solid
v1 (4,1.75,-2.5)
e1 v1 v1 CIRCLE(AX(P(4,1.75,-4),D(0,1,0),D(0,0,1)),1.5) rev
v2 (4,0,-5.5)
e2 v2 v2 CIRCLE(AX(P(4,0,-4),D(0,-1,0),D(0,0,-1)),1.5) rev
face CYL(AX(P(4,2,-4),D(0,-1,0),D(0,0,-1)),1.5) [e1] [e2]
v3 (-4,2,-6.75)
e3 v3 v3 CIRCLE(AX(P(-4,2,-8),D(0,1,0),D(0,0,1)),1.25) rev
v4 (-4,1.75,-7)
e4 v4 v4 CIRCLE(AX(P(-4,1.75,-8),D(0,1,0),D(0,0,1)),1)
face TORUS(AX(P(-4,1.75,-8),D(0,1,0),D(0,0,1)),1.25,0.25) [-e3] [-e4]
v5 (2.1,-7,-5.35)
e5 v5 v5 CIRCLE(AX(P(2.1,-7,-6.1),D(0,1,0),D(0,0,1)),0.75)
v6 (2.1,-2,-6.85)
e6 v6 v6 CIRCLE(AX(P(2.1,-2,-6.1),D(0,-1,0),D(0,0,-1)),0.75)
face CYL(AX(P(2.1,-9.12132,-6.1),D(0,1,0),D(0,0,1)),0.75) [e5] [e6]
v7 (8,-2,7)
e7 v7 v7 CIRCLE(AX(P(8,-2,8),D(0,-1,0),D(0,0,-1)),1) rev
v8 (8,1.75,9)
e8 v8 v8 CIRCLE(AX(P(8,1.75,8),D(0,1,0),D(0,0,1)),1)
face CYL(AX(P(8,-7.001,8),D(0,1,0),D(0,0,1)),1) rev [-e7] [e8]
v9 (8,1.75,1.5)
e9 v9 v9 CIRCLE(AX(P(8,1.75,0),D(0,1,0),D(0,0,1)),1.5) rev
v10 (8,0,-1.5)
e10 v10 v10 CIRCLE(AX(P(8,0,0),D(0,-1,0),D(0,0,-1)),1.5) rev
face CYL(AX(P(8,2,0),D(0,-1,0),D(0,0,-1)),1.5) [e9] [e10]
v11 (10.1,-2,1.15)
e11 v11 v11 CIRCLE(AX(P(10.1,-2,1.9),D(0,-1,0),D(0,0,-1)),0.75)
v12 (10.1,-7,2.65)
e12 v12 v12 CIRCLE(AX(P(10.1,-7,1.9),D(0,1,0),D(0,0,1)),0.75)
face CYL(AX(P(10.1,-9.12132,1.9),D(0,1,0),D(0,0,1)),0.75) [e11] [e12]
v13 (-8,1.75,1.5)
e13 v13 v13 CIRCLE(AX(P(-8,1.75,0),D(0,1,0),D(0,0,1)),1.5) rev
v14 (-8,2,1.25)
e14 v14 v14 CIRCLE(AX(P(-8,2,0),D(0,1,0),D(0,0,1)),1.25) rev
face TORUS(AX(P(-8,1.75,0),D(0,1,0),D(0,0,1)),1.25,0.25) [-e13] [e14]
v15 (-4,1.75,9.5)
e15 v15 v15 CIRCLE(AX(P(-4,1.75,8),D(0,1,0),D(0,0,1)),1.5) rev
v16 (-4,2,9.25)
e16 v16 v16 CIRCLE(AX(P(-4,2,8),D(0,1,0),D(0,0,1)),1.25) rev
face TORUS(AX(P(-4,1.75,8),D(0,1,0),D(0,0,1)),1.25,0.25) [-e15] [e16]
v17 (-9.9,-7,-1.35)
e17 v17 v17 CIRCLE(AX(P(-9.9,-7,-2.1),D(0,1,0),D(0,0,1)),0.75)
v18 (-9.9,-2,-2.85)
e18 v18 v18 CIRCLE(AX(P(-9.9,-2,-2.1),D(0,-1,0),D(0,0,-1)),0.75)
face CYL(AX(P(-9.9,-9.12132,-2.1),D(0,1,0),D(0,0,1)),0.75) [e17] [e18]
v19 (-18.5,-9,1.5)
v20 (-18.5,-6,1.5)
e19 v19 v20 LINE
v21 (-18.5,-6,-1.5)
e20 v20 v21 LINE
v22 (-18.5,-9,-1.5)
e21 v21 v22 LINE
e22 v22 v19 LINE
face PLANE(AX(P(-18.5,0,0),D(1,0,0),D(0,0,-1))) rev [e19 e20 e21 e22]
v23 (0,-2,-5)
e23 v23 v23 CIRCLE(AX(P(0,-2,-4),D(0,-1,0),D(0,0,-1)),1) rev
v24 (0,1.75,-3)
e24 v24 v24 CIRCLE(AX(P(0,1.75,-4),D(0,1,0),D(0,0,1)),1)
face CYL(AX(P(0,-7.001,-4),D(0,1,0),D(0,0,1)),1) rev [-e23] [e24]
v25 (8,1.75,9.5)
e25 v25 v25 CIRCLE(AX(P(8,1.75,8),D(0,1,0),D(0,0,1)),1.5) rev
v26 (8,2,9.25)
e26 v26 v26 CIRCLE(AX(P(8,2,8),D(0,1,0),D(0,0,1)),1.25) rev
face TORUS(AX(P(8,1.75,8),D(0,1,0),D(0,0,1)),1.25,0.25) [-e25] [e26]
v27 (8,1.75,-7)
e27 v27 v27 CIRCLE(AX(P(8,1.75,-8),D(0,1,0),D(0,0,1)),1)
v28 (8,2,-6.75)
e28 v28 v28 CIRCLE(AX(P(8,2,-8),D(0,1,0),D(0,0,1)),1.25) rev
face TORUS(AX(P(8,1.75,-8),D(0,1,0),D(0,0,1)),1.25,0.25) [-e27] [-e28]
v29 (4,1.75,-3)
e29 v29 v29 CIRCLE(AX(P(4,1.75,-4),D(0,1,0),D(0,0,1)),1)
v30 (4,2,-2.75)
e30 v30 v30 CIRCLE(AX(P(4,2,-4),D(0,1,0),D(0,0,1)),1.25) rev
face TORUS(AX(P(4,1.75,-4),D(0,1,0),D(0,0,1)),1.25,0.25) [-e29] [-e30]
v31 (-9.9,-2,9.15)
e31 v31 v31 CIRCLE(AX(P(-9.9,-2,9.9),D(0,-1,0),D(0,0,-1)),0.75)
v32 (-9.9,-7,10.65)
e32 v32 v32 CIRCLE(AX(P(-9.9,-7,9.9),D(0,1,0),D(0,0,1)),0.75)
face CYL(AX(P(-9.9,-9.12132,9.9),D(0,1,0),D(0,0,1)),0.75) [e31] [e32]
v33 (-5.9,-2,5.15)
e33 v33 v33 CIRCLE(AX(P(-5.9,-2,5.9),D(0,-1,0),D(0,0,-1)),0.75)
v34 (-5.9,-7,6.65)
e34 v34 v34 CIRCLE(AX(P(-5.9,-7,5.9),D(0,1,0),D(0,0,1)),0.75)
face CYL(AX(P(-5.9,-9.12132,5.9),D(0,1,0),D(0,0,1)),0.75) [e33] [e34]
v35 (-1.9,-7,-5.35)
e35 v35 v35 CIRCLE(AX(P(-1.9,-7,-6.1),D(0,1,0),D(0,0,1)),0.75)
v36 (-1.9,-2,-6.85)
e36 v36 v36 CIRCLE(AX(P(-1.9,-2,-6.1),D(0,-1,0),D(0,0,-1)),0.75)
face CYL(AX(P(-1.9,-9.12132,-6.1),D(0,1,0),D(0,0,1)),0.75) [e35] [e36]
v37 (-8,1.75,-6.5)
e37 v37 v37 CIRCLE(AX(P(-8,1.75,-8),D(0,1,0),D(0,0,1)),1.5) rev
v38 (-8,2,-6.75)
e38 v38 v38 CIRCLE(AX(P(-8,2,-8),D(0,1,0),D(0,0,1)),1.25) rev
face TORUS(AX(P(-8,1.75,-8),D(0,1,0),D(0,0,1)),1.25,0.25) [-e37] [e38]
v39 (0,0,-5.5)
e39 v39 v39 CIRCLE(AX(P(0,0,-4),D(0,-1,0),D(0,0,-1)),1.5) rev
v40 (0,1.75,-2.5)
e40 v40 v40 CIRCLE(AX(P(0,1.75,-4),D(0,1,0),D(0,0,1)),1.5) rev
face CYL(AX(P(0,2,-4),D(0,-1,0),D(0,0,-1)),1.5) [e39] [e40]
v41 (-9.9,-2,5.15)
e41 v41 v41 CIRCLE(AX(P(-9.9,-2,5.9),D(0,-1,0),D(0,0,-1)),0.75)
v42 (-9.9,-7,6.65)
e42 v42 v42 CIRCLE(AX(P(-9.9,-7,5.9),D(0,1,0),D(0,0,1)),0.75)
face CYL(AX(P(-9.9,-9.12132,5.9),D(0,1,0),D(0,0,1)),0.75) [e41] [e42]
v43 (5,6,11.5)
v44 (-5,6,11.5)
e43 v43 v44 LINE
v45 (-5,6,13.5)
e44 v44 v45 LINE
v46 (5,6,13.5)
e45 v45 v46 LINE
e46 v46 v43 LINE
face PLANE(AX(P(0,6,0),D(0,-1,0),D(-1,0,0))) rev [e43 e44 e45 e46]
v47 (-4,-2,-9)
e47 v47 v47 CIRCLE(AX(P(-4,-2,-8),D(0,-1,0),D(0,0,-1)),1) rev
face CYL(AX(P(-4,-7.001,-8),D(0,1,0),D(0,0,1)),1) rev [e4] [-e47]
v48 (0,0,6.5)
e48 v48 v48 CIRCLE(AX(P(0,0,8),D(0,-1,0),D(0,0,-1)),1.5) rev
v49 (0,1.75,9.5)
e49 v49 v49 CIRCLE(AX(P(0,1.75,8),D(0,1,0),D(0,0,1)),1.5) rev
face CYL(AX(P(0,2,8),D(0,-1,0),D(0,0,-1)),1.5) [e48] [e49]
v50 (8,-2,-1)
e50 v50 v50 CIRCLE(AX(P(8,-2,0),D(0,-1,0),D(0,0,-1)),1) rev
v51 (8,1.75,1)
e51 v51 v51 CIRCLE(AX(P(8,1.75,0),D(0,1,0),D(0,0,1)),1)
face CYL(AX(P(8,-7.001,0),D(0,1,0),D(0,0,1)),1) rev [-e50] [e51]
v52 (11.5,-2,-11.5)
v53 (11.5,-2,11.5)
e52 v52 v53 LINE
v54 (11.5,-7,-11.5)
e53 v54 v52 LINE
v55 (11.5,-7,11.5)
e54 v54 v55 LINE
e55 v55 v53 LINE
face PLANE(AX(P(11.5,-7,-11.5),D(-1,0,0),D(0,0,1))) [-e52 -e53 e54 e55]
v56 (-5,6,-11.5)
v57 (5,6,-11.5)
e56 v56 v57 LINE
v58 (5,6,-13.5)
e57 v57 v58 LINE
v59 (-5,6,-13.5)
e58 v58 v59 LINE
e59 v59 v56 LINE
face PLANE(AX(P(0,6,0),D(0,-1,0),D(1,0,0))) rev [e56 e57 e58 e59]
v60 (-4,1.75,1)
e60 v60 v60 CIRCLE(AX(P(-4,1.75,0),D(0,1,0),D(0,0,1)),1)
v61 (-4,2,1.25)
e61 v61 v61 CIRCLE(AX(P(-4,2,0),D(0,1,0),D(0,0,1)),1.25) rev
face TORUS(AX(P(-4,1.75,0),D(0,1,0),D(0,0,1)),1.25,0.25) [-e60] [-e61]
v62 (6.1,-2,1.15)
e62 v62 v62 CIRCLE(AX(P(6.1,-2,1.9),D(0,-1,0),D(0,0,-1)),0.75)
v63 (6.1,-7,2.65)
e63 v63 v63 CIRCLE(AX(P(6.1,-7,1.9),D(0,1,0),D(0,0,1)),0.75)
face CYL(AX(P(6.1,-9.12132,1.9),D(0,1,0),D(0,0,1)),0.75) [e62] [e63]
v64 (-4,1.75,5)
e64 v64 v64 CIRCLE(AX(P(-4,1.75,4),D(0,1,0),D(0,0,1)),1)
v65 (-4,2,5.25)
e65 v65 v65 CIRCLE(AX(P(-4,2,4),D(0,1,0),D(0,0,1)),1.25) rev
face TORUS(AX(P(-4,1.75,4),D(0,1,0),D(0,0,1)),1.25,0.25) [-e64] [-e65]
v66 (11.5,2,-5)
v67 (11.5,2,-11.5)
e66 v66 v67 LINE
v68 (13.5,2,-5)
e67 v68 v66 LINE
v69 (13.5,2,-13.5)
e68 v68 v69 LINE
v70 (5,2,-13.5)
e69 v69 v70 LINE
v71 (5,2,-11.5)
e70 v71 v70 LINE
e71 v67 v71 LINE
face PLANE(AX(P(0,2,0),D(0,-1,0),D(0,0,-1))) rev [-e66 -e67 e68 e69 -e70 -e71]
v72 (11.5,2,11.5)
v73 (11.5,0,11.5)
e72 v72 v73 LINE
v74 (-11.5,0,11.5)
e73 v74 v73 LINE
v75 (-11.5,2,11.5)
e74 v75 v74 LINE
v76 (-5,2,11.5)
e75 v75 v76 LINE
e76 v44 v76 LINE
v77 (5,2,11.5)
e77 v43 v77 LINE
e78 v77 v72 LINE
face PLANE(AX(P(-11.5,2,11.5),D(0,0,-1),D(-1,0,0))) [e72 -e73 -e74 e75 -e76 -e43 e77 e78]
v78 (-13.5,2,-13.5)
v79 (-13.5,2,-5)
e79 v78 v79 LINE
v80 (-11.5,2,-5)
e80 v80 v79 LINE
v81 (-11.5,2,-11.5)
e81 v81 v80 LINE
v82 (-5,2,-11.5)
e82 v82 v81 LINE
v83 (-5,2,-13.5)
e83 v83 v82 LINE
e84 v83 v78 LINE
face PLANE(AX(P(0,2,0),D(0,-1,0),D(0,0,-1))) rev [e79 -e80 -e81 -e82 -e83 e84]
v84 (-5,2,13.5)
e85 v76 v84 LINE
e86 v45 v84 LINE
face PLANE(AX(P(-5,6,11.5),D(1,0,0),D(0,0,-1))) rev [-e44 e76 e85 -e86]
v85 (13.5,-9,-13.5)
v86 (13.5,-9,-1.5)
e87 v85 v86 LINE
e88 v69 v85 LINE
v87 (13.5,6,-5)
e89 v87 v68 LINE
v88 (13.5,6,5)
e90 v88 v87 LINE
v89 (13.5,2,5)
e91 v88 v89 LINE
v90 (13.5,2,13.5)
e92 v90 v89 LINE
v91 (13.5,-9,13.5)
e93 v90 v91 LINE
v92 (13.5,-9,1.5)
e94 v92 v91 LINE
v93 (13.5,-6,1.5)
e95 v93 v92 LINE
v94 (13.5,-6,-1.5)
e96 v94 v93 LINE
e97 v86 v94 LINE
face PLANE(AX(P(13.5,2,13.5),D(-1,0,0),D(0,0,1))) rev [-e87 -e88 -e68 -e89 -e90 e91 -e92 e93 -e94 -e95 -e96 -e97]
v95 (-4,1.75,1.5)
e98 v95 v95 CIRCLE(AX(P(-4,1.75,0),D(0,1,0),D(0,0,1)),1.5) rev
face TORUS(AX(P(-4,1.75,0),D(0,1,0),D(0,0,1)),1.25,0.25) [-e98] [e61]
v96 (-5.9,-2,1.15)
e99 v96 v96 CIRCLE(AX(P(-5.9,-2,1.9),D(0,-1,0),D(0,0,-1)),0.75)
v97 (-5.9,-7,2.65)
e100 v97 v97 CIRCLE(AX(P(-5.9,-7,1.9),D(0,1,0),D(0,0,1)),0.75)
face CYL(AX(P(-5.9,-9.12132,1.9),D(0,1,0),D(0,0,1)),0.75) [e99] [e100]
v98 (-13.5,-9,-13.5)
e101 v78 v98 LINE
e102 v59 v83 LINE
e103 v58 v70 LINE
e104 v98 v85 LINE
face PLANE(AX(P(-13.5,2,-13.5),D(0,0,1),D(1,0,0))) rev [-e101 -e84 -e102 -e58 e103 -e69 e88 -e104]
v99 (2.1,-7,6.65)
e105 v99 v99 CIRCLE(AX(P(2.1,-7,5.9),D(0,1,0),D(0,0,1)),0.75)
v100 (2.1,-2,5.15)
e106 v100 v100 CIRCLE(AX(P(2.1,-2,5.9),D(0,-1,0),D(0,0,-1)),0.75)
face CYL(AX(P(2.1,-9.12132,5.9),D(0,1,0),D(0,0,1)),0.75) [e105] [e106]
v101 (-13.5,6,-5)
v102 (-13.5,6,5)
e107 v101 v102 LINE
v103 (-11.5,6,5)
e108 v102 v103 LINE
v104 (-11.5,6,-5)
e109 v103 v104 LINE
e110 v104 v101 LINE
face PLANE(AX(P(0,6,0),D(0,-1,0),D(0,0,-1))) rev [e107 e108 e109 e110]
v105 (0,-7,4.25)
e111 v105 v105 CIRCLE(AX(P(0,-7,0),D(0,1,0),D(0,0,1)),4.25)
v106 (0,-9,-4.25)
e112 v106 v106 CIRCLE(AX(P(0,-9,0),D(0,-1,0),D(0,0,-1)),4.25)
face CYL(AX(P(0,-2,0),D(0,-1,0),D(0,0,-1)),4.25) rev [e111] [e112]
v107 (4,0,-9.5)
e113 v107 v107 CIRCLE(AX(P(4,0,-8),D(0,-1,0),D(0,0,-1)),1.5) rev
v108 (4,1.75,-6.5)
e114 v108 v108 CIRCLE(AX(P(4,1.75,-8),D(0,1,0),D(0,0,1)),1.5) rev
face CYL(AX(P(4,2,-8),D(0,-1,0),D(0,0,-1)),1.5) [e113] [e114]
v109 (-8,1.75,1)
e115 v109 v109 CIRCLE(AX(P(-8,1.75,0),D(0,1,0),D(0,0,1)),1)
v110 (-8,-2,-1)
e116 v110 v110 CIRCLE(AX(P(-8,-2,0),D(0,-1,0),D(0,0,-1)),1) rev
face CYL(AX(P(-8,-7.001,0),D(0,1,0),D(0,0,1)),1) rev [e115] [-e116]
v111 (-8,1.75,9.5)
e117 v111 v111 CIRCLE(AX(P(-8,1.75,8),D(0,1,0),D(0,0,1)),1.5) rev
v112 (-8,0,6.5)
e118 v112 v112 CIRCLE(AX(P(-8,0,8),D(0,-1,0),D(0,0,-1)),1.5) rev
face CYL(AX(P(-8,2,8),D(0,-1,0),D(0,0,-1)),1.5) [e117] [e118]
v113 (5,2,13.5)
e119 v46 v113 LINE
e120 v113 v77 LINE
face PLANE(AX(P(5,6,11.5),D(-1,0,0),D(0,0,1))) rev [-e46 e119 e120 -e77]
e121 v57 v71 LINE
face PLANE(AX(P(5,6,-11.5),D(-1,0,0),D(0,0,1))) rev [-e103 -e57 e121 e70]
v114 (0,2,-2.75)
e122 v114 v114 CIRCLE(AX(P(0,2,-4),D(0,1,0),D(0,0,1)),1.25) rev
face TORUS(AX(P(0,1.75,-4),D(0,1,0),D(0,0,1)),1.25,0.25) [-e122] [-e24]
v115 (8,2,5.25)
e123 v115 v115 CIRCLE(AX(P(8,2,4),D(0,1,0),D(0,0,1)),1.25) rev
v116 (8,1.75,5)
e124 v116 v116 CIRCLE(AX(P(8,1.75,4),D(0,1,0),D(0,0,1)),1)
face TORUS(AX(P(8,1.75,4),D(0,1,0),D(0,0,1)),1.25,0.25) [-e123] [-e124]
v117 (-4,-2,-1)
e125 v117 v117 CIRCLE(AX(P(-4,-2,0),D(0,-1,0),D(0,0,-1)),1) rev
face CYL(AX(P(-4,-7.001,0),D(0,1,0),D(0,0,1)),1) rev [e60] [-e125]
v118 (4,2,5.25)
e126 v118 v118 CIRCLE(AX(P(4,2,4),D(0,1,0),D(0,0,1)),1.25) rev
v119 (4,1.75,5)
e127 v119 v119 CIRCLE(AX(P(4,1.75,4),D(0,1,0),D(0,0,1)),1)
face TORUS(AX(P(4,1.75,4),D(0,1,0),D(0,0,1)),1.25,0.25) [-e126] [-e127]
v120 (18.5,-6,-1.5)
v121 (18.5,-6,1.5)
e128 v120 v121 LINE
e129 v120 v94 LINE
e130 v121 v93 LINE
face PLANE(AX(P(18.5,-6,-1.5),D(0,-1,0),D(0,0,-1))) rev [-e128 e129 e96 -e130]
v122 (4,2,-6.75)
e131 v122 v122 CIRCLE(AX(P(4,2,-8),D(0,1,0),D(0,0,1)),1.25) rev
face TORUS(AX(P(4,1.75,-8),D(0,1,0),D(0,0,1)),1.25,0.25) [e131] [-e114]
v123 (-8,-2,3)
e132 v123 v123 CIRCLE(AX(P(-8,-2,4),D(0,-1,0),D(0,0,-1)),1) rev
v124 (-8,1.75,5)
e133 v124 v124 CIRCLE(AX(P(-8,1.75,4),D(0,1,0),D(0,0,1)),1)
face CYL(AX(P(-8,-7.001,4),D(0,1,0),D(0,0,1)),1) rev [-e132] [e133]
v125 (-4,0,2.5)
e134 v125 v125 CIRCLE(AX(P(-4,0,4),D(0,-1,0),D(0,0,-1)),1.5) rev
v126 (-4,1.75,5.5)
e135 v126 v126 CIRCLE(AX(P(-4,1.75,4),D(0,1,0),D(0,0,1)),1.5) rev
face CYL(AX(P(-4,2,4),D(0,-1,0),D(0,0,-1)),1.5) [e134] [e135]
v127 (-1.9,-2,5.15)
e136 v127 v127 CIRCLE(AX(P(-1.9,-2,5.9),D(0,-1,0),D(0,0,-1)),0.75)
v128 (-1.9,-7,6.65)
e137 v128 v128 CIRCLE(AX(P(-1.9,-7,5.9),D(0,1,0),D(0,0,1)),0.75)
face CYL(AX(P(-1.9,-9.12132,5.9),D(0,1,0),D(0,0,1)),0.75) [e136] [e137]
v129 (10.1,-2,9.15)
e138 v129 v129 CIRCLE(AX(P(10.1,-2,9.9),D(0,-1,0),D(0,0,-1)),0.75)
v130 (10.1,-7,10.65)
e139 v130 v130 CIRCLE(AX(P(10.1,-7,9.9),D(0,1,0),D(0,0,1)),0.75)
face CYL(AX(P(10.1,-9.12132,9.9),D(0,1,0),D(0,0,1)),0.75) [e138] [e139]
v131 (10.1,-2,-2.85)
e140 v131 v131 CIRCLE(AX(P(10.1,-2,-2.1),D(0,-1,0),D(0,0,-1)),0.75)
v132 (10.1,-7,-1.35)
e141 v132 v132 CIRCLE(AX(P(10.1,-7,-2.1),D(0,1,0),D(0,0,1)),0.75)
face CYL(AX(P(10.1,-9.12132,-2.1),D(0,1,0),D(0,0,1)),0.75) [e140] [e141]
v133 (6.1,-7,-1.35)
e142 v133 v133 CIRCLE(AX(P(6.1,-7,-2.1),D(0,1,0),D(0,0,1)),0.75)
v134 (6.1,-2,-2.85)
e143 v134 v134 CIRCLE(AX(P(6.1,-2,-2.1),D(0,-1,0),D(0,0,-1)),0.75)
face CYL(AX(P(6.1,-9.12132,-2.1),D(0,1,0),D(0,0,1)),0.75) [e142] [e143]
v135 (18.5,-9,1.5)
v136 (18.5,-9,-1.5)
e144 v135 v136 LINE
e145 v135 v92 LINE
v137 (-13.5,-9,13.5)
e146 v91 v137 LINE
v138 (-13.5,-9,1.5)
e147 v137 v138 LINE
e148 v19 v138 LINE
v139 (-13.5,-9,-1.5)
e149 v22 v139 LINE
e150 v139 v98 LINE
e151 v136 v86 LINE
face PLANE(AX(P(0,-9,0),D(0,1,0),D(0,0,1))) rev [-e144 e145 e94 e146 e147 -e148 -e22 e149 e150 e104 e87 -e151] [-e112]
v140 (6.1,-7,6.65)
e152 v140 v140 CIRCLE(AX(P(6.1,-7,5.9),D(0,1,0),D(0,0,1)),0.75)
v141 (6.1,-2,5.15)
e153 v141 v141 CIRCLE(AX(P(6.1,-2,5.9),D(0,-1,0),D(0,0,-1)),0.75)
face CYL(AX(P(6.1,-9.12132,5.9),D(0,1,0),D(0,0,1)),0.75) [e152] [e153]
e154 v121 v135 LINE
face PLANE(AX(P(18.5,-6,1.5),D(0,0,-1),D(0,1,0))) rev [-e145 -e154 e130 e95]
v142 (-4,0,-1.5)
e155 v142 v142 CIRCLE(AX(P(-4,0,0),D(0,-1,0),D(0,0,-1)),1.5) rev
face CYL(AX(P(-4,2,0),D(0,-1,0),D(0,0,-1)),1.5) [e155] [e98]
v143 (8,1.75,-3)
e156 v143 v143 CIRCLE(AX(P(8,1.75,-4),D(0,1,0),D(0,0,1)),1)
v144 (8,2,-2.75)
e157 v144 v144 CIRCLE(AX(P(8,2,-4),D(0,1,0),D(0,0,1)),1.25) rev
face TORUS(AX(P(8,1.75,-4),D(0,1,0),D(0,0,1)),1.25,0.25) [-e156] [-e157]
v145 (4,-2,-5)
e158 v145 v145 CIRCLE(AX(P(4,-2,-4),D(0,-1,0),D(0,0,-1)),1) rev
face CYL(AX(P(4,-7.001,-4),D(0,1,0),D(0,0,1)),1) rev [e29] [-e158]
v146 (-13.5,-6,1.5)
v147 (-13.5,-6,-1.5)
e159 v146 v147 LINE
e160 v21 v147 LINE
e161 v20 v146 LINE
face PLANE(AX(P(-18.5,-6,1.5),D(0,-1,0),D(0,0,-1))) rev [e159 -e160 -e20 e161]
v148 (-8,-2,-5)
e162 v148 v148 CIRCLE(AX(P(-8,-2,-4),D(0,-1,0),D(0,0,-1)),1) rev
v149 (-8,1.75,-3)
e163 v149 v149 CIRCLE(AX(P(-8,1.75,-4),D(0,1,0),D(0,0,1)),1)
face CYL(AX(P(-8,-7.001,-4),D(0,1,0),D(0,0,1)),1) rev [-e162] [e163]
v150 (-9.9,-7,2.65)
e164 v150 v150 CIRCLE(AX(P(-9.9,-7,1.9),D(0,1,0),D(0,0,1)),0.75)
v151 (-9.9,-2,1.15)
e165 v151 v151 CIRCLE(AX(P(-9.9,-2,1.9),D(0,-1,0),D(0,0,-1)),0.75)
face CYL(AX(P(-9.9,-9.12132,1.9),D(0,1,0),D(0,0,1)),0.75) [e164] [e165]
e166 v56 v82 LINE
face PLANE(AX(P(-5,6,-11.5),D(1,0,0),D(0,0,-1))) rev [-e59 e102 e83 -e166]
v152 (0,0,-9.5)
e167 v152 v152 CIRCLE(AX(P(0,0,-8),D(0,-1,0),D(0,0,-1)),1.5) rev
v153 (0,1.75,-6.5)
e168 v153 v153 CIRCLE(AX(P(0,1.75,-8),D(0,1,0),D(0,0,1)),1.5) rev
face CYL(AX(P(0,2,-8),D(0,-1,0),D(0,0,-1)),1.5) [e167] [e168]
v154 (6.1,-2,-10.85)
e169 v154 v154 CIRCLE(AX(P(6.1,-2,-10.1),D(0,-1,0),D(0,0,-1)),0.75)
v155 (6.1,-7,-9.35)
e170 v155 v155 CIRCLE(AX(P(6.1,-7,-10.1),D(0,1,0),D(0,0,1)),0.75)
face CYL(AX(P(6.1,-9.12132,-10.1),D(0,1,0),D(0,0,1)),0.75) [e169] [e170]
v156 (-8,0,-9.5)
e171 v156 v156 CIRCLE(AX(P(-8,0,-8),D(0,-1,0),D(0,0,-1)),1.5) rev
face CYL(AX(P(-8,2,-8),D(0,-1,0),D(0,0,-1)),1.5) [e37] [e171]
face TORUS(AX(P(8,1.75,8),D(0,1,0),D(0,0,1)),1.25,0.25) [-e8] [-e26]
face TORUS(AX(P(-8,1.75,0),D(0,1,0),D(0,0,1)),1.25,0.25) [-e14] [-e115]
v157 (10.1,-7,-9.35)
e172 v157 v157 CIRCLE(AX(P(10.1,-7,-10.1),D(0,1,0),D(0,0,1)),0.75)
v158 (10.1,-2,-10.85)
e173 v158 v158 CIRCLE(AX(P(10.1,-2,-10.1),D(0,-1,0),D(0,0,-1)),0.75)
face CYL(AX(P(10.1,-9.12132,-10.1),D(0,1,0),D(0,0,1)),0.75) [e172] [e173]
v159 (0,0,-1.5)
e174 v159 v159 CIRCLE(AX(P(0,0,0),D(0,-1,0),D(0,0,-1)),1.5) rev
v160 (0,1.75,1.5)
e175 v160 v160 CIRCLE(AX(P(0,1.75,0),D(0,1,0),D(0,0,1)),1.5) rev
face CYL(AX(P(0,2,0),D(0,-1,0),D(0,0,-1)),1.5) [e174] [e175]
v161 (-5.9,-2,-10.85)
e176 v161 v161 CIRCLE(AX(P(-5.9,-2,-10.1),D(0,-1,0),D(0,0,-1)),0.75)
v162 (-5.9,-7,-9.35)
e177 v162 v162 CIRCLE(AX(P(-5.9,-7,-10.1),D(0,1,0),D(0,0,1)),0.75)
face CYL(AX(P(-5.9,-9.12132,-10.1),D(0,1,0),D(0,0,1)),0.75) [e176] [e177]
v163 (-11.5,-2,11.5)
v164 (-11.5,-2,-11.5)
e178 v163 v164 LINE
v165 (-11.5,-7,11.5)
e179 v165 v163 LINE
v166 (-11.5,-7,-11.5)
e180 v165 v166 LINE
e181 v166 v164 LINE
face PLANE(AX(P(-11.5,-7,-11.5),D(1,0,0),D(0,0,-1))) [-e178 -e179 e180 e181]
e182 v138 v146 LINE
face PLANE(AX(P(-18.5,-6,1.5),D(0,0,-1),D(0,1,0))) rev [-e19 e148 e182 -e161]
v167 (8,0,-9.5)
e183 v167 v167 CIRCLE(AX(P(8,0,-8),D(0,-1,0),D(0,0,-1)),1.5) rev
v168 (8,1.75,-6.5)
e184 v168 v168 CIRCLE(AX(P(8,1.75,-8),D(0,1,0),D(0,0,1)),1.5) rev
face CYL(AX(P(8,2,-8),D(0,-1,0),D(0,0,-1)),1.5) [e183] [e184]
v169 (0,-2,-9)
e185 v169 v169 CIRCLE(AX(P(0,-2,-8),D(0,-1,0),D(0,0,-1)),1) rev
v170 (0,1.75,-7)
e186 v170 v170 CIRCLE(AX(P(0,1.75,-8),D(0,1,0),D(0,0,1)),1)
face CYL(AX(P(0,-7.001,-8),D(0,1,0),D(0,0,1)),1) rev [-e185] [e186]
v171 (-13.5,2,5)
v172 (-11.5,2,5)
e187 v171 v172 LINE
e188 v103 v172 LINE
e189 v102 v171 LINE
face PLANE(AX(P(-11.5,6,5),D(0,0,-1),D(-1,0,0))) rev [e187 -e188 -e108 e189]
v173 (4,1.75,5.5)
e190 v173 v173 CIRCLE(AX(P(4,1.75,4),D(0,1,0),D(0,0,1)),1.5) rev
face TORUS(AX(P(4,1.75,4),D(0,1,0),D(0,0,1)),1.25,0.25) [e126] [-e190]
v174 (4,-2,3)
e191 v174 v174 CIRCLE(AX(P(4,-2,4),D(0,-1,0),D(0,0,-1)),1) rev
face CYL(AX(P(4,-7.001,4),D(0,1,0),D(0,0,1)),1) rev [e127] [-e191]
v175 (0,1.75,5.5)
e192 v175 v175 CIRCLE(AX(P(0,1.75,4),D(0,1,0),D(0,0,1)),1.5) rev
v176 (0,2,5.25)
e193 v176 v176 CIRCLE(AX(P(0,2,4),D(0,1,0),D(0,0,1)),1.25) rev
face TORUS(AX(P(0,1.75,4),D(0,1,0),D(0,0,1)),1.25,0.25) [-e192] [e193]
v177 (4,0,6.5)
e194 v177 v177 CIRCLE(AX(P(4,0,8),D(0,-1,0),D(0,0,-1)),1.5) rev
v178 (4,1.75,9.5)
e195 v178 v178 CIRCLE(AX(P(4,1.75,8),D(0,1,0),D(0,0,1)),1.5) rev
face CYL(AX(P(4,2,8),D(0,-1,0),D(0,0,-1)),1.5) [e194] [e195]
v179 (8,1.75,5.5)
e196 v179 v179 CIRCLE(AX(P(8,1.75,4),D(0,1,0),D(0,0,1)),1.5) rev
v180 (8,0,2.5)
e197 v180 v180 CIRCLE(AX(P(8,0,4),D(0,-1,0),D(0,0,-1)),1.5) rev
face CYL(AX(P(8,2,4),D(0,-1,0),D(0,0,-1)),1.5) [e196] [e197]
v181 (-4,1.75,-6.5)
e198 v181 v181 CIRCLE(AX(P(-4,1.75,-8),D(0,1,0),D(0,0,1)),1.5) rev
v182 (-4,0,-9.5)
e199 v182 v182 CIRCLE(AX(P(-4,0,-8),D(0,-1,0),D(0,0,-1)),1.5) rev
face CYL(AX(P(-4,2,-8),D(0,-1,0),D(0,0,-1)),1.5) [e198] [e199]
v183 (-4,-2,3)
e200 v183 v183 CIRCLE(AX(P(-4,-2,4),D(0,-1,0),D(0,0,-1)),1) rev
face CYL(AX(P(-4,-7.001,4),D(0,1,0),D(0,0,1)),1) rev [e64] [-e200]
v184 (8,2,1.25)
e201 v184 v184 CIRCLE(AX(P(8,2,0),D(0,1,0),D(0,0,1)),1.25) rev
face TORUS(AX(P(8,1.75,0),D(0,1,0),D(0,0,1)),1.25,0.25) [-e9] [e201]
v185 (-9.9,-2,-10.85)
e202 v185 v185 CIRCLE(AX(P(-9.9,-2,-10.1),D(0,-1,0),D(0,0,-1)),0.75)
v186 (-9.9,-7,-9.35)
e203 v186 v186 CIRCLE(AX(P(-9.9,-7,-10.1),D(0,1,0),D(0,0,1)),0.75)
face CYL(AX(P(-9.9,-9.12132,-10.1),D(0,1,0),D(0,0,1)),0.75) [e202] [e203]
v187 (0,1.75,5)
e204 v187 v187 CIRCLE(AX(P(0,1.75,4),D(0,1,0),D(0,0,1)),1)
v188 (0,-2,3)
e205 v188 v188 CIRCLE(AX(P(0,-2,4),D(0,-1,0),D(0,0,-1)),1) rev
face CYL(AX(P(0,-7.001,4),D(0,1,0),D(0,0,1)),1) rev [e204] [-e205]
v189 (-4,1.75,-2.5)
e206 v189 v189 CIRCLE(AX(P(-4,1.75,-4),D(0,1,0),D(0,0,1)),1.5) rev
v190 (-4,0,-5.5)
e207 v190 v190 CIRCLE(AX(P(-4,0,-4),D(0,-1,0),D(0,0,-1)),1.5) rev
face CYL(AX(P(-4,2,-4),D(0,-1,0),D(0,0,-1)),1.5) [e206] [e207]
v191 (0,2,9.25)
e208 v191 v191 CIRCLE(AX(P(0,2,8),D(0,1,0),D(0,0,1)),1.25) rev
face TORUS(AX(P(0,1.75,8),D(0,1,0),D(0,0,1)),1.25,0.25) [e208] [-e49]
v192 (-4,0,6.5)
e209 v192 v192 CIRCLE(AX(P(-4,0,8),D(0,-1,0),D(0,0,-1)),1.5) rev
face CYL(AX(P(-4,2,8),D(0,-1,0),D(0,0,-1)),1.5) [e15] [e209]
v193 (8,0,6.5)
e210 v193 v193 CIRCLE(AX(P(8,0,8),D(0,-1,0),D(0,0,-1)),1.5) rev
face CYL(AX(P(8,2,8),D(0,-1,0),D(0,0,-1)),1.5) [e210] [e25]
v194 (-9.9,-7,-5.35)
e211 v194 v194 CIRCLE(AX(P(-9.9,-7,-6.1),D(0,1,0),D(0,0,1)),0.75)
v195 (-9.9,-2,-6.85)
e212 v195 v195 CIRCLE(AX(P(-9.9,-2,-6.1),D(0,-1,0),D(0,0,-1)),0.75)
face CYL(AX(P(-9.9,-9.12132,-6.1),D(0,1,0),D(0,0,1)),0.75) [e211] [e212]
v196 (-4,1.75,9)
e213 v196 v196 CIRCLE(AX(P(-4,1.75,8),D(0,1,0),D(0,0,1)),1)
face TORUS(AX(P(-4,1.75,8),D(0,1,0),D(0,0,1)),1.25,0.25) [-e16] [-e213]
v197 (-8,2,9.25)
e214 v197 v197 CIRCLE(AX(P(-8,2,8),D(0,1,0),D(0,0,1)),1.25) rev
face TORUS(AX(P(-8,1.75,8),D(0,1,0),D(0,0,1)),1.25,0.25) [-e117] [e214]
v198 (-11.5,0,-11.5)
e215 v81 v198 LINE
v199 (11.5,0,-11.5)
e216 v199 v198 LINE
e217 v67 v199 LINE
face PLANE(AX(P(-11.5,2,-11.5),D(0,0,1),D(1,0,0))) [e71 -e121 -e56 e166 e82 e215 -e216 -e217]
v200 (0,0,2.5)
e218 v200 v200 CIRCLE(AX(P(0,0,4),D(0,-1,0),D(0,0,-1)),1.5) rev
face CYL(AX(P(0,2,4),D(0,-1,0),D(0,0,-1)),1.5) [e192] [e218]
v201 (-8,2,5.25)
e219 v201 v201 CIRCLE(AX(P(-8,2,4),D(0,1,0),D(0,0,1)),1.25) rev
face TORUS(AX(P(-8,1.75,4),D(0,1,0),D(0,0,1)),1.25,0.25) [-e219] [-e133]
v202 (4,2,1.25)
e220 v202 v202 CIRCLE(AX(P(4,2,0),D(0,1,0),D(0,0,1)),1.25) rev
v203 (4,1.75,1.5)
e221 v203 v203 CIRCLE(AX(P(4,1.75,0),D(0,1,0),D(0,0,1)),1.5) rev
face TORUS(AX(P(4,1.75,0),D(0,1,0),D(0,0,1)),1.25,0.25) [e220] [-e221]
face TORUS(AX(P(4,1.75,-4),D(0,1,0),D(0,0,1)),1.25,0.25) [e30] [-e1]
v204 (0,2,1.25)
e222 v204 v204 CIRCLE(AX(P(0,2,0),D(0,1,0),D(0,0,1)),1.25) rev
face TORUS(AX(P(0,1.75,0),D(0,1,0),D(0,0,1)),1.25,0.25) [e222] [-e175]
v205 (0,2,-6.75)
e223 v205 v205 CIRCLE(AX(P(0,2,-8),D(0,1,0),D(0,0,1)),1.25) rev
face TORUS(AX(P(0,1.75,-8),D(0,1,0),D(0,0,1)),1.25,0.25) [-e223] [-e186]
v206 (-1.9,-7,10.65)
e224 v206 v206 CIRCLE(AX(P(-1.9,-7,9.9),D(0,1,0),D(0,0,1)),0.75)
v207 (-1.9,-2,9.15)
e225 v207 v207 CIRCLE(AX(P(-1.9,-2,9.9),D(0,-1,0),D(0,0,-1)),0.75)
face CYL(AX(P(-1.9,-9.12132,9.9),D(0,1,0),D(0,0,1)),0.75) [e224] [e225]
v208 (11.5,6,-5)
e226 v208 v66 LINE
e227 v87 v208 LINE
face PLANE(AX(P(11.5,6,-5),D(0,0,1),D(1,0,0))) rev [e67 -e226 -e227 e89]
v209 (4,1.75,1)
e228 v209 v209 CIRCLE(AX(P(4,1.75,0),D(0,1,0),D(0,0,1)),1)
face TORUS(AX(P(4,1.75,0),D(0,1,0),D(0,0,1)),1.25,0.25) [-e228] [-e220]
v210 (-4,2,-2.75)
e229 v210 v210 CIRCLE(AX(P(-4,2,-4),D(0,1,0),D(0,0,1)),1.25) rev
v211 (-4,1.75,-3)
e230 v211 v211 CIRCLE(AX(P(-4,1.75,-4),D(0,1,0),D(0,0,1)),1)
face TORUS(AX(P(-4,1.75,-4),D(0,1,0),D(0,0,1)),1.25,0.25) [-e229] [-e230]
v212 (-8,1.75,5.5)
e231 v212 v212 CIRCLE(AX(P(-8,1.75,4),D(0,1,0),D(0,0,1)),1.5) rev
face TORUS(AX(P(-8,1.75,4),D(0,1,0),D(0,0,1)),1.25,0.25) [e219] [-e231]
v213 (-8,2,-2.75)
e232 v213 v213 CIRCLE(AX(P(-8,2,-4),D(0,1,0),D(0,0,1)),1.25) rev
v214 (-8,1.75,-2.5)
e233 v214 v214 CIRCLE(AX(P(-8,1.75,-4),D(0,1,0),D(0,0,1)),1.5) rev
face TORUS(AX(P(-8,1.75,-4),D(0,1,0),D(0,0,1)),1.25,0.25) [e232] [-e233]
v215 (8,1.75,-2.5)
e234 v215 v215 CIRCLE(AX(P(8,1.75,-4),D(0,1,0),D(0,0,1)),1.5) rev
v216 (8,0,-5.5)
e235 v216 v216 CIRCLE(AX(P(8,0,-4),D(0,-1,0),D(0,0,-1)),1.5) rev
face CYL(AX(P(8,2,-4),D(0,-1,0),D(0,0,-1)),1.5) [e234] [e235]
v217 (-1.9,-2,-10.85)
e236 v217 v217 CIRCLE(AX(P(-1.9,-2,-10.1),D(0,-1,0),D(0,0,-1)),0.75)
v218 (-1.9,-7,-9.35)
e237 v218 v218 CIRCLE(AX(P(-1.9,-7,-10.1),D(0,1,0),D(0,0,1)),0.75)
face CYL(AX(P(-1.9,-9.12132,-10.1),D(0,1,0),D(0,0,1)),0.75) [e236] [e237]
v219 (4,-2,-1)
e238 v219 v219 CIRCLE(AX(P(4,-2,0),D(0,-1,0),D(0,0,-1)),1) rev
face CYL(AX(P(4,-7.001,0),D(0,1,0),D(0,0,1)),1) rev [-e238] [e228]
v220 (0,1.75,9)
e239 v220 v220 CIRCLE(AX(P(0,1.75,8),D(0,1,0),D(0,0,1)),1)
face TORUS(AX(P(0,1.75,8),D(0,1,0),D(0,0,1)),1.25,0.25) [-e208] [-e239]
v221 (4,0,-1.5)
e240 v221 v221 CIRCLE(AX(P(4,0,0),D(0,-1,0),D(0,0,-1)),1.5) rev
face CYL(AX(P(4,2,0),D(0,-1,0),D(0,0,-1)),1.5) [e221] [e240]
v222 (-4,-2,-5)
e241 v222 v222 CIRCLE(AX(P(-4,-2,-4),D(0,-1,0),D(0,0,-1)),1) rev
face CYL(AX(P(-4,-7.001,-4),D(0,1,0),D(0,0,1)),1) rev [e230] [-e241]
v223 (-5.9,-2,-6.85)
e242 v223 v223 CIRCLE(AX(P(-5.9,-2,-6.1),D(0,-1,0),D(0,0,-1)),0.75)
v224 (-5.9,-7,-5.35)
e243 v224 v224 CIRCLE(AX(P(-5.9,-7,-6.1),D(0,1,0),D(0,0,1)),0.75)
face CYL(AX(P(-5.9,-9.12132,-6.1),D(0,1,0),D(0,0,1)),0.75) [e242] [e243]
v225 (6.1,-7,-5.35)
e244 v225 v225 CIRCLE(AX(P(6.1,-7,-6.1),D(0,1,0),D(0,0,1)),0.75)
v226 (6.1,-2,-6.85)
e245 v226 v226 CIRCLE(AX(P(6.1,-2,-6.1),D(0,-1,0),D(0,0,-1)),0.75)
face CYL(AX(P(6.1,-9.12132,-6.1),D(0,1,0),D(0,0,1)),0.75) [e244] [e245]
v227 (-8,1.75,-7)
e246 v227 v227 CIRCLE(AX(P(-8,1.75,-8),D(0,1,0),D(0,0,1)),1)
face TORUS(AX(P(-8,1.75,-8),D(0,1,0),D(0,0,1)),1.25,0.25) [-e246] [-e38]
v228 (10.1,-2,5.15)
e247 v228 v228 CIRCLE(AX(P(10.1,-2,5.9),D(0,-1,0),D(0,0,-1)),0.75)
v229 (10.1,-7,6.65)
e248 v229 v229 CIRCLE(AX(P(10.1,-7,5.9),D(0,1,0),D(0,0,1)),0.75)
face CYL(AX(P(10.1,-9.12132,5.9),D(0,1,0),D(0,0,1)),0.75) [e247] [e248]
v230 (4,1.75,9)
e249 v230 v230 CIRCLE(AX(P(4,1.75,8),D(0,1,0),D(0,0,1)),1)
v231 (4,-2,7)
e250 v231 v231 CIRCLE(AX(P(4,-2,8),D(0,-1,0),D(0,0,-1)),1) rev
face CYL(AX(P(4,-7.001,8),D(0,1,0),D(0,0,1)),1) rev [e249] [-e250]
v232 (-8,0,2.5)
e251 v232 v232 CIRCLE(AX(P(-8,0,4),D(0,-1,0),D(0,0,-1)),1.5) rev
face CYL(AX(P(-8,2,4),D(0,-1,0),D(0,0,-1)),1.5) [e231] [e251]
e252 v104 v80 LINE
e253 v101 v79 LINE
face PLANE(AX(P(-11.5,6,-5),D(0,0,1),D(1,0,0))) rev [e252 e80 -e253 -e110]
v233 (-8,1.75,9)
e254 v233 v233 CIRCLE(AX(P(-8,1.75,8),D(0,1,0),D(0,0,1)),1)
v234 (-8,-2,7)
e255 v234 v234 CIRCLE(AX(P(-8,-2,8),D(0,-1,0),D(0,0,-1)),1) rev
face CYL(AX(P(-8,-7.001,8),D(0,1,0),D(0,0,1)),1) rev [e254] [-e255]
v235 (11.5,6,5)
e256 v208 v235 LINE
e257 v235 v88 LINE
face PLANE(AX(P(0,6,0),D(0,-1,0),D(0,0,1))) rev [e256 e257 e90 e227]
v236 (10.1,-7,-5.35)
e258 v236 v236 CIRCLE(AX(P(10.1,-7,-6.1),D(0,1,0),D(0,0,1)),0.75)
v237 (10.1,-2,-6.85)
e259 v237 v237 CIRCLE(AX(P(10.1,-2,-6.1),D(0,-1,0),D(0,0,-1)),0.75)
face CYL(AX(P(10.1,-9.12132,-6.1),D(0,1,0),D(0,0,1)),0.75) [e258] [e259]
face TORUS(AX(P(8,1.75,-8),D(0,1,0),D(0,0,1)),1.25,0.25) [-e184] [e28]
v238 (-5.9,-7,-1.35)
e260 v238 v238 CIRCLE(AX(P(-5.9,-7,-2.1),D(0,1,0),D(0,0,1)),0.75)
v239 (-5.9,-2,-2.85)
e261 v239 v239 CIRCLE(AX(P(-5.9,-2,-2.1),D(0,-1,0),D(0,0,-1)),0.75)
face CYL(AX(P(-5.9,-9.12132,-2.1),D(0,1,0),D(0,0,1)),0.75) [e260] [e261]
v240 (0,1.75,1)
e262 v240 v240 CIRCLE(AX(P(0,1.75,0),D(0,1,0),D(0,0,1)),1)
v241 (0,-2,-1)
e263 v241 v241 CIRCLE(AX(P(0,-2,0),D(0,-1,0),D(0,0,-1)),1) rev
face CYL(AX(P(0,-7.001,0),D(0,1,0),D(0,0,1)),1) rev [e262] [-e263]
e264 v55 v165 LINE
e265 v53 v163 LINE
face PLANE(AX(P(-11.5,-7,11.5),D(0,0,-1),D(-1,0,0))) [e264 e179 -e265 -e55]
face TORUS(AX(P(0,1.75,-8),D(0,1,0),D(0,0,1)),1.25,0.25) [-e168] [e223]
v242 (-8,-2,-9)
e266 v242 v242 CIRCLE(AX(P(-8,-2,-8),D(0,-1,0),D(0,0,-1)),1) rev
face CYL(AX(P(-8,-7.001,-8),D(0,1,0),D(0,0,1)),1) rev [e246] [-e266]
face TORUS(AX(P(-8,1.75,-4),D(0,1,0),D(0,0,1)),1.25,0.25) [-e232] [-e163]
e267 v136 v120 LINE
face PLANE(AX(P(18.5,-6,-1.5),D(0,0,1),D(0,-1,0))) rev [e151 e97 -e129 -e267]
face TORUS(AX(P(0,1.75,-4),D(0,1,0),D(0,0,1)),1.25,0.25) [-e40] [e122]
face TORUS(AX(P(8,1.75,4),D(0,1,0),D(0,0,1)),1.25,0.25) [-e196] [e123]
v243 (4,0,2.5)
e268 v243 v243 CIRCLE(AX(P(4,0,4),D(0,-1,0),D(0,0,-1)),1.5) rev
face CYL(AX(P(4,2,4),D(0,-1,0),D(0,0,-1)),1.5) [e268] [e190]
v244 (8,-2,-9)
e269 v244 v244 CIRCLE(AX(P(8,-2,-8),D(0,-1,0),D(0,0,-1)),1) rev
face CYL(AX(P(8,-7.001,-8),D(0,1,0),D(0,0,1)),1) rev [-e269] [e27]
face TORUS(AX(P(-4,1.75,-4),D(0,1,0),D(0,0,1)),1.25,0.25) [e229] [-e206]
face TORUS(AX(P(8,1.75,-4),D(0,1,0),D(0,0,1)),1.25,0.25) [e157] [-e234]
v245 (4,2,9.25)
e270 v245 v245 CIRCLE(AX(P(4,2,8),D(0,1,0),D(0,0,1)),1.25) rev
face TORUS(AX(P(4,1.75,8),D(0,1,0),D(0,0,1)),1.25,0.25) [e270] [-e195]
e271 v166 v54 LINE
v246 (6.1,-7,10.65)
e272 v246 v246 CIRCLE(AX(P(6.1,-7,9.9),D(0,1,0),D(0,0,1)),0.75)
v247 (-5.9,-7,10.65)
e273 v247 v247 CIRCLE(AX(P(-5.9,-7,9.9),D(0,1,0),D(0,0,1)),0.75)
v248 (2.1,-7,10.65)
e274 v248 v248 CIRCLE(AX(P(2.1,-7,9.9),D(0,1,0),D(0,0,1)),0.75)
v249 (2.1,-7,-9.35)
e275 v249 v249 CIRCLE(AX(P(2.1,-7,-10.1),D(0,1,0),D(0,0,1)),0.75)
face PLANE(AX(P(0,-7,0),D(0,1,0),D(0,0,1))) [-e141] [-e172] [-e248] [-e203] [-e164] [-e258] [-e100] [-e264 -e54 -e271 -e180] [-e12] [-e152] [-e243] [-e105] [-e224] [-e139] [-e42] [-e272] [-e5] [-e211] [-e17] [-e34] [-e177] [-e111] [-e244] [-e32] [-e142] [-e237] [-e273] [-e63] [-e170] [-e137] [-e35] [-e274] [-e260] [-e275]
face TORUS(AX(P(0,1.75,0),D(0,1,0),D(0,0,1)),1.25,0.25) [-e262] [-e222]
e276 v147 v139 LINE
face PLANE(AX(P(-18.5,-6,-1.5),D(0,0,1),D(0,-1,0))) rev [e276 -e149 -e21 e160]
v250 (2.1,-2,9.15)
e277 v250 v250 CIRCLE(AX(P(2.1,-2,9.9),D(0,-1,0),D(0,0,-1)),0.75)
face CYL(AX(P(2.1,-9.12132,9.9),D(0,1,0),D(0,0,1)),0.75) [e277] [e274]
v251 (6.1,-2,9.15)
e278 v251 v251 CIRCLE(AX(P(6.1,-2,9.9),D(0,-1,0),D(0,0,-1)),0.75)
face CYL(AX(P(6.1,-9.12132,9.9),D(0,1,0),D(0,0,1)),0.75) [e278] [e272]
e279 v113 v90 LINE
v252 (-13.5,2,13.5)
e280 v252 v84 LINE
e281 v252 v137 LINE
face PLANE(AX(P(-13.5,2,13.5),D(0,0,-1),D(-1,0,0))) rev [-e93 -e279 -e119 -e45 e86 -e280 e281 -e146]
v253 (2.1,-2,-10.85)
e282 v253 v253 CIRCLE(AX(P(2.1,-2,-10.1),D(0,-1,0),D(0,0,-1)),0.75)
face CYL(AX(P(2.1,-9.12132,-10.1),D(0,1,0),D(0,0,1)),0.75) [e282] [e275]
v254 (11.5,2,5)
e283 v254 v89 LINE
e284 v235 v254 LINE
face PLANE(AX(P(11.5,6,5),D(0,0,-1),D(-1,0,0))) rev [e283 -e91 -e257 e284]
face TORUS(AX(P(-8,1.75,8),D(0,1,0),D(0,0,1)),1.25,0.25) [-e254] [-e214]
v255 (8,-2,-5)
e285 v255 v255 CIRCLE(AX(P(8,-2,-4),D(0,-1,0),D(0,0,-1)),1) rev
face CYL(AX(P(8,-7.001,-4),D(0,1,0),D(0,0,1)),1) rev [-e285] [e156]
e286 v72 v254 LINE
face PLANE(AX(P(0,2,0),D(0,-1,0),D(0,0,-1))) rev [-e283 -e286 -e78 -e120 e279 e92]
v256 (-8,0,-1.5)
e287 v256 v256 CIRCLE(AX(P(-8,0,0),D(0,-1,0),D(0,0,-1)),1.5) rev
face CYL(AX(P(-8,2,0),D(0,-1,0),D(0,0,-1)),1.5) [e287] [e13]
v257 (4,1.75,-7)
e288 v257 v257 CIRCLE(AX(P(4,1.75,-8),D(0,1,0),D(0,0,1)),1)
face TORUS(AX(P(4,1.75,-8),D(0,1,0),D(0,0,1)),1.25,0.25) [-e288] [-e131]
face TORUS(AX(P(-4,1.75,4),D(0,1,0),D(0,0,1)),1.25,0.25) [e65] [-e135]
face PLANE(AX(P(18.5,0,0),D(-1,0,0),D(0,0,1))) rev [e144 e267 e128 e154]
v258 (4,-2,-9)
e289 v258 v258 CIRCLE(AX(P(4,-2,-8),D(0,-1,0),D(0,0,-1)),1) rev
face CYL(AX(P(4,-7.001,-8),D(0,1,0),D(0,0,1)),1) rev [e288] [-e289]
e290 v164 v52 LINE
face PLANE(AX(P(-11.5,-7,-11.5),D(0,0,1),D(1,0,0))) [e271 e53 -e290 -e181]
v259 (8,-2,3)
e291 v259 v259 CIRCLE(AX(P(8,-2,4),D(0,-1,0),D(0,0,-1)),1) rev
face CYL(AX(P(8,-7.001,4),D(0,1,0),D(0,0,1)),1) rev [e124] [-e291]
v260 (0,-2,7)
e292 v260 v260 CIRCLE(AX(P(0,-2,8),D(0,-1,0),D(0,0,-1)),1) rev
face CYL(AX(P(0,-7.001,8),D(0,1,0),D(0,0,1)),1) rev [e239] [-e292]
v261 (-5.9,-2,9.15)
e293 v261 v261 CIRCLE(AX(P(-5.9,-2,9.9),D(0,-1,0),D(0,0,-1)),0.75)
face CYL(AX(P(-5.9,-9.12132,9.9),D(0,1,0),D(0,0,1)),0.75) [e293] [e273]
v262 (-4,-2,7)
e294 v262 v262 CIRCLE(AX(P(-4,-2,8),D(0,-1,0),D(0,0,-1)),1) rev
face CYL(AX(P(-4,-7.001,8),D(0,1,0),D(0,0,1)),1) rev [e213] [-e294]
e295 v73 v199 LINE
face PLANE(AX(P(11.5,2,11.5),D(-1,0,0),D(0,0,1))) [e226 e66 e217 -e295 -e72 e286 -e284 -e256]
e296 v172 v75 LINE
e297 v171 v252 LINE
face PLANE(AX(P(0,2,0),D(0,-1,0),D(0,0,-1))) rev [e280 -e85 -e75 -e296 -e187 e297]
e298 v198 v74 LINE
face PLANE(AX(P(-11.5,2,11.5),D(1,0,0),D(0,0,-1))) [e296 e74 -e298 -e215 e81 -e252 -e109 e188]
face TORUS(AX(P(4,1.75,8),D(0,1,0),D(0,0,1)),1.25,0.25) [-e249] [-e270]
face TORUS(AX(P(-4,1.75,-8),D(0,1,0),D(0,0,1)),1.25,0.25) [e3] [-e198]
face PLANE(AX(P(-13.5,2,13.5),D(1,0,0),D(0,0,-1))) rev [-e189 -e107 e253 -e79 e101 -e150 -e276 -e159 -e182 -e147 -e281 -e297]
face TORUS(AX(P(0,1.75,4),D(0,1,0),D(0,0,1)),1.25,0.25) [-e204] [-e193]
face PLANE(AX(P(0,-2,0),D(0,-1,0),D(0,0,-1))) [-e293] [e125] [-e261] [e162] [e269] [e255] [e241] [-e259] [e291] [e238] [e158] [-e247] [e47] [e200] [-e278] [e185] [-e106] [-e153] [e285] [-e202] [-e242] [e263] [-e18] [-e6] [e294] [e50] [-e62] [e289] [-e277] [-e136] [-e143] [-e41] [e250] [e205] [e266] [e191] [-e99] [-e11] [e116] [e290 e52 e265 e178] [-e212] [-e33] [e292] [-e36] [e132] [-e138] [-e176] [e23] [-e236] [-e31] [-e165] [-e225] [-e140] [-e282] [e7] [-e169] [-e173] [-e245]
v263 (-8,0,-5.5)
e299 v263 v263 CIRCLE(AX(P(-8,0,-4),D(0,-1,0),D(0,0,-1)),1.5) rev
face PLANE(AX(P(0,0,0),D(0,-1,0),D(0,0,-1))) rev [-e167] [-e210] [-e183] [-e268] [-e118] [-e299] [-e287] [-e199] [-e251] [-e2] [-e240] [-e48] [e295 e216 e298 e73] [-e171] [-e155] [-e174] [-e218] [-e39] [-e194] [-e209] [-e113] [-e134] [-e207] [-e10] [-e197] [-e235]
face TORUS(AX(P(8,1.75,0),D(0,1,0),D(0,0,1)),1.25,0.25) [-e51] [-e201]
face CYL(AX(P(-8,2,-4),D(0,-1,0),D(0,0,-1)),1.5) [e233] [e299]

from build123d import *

# Parameters (mm, degrees)
SKETCH1_W              = 27
SKETCH1_H              = 27
SKETCH1_W_2            = 23
SKETCH1_H_2            = 23
BOSS_EXTRUDE1_DEPTH    = 2
SKETCH2_W              = 27
SKETCH2_H              = 27
BOSS_EXTRUDE2_DEPTH    = 2
SKETCH3_W              = 27
SKETCH3_H              = 27
SKETCH3_W_2            = 23
SKETCH3_H_2            = 23
BOSS_EXTRUDE3_DEPTH    = 5
SKETCH6_R              = 1.5
BOSS_EXTRUDE5_DEPTH    = 2
CUT_EXTRUDE2_REACH     = 23.107
SKETCH7_R              = 1
FILLET1_R              = 0.25
LPATTERN3_COUNT        = 5
LPATTERN3_PITCH        = 4
LPATTERN3_COUNT_DIR2   = 5
LPATTERN3_PITCH_DIR2   = 4
FILLET1_OF_LPATTERN3_R = 0.25
SKETCH11_R             = 0.75
BOSS_EXTRUDE8_DEPTH    = 5
LPATTERN2_COUNT        = 6
LPATTERN2_PITCH        = 4
LPATTERN2_COUNT_DIR2   = 6
LPATTERN2_PITCH_DIR2   = 4
SKETCH8_W              = 27
SKETCH8_H              = 27
BOSS_EXTRUDE6_DEPTH    = 2
SKETCH9_R              = 4.25
CUT_EXTRUDE3_DEPTH     = 7
SKETCH10_W             = 2
SKETCH10_H             = 10
BOSS_EXTRUDE7_DEPTH    = 4
CIRPATTERN2_COUNT      = 4
SKETCH12_W             = 3
SKETCH12_H             = 3
BOSS_EXTRUDE9_DEPTH    = 5
CIRPATTERN1_COUNT      = 2


with BuildPart() as part:
    # Sketch1 → Boss-Extrude1 (new body)
    with BuildSketch(Plane(origin=(0, 0, 0), x_dir=(1, 0, 0), z_dir=(0, 1, 0))):
        Rectangle(SKETCH1_W, SKETCH1_H)
        Rectangle(SKETCH1_W_2, SKETCH1_H_2, mode=Mode.SUBTRACT)
    extrude(amount=BOSS_EXTRUDE1_DEPTH)

    # Sketch2 → Boss-Extrude2 (add)
    with BuildSketch(Plane.XZ):
        Rectangle(SKETCH2_W, SKETCH2_H)
    extrude(amount=BOSS_EXTRUDE2_DEPTH)

    # Sketch3 → Boss-Extrude3 (add)
    with BuildSketch(Plane.XZ.offset(2)):
        Rectangle(SKETCH3_W, SKETCH3_H)
        Rectangle(SKETCH3_W_2, SKETCH3_H_2, mode=Mode.SUBTRACT)
    extrude(amount=BOSS_EXTRUDE3_DEPTH)

    # Sketch6 → Boss-Extrude5 (add)
    with BuildSketch(Plane(origin=(0, 0, 0), x_dir=(1, 0, 0), z_dir=(0, 1, 0))):
        with Locations(Location((8, 8, 0), (0, 0, 90))):
            Circle(SKETCH6_R)
    boss_extrude5 = extrude(amount=BOSS_EXTRUDE5_DEPTH)

    # Sketch7 → Cut-Extrude2 (cut, up to next)
    with BuildSketch(Plane(origin=(0, 2, 0), x_dir=(1, 0, 0), z_dir=(0, 1, 0)), mode=Mode.PRIVATE) as cut_extrude2_sk1:
        with Locations(Location((8, 8, 0), (0, 0, 270))):
            Circle(SKETCH7_R)
    cut_extrude2_tool1 = extrude(cut_extrude2_sk1.sketch, amount=-CUT_EXTRUDE2_REACH, mode=Mode.PRIVATE) & part.part
    cut_extrude2 = cut_extrude2_tool1.solids().sort_by_distance((8, 2, -8))[0]
    add(cut_extrude2, mode=Mode.SUBTRACT)

    # Fillet1
    fillet1_edges = [part.edges().sort_by_distance(p)[0] for p in [
        (8, 2, -6.5),
        (8, 2, -9),
    ]]
    fillet(fillet1_edges, radius=FILLET1_R - 0.0001)  # a hair under: the kernel refuses the full size

    # LPattern3: Boss-Extrude5, Cut-Extrude2 5 × 5
    with Locations(*[(-j * LPATTERN3_PITCH_DIR2, 0, i * LPATTERN3_PITCH) for i in range(LPATTERN3_COUNT) for j in range(LPATTERN3_COUNT_DIR2) if (i, j) != (0, 0)]):
        add(boss_extrude5)
        add(cut_extrude2, mode=Mode.SUBTRACT)

    # Fillet1 of LPattern3
    fillet1_of_lpattern3_edges = [part.edges().sort_by_distance(p)[0] for p in [
        (4, 2, -6.5),
        (4, 2, -9),
        (0, 2, -6.5),
        (0, 2, -9),
        (-4, 2, -6.5),
        (-4, 2, -9),
        (-8, 2, -6.5),
        (-8, 2, -9),
        (8, 2, -2.5),
        (8, 2, -5),
        (4, 2, -2.5),
        (4, 2, -5),
        (0, 2, -2.5),
        (0, 2, -5),
        (-4, 2, -2.5),
        (-4, 2, -5),
        (-8, 2, -2.5),
        (-8, 2, -5),
        (8, 2, 1.5),
        (8, 2, -1),
        (4, 2, 1.5),
        (4, 2, -1),
        (0, 2, 1.5),
        (0, 2, -1),
        (-4, 2, 1.5),
        (-4, 2, -1),
        (-8, 2, 1.5),
        (-8, 2, -1),
        (8, 2, 5.5),
        (8, 2, 3),
        (4, 2, 5.5),
        (4, 2, 3),
        (0, 2, 5.5),
        (0, 2, 3),
        (-4, 2, 5.5),
        (-4, 2, 3),
        (-8, 2, 5.5),
        (-8, 2, 3),
        (8, 2, 9.5),
        (8, 2, 7),
        (4, 2, 9.5),
        (4, 2, 7),
        (0, 2, 9.5),
        (0, 2, 7),
        (-4, 2, 9.5),
        (-4, 2, 7),
        (-8, 2, 9.5),
        (-8, 2, 7),
    ]]
    fillet(fillet1_of_lpattern3_edges, radius=FILLET1_OF_LPATTERN3_R - 0.0001)  # a hair under: the kernel refuses the full size

    # Sketch11 → Boss-Extrude8 (add)
    with BuildSketch(Plane.XZ.offset(2)):
        with Locations(Location((-9.9, 9.9, 0), (0, 0, 90))):
            Circle(SKETCH11_R)
    boss_extrude8 = extrude(amount=BOSS_EXTRUDE8_DEPTH)

    # LPattern2: Boss-Extrude8 6 × 6
    with Locations(*[(i * LPATTERN2_PITCH, 0, -j * LPATTERN2_PITCH_DIR2) for i in range(LPATTERN2_COUNT) for j in range(LPATTERN2_COUNT_DIR2) if (i, j) != (0, 0)]):
        add(boss_extrude8)

    # Sketch8 → Boss-Extrude6 (add)
    with BuildSketch(Plane.XZ.offset(7)):
        Rectangle(SKETCH8_W, SKETCH8_H)
    extrude(amount=BOSS_EXTRUDE6_DEPTH)

    # Sketch9 → Cut-Extrude3 (cut)
    with BuildSketch(Plane.XZ.offset(9)):
        with Locations(Location((0, 0, 0), (0, 0, 270))):
            Circle(SKETCH9_R)
    extrude(amount=-CUT_EXTRUDE3_DEPTH, mode=Mode.SUBTRACT)

    # Sketch10 → Boss-Extrude7 (add)
    with BuildSketch(Plane(origin=(0, 2, 0), x_dir=(1, 0, 0), z_dir=(0, 1, 0))):
        with Locations((-12.5, 0)):
            Rectangle(SKETCH10_W, SKETCH10_H)
    boss_extrude7 = extrude(amount=BOSS_EXTRUDE7_DEPTH)

    # CirPattern2: Boss-Extrude7 ×4 about axis
    cirpattern2_axis = Axis((0, 0, 0), (0, 1, 0))
    for i in range(1, CIRPATTERN2_COUNT):
        add(boss_extrude7.rotate(cirpattern2_axis, i * 360 / CIRPATTERN2_COUNT))

    # Sketch12 → Boss-Extrude9 (add)
    with BuildSketch(Plane.ZY.offset(13.5)):
        with Locations((0, -7.5)):
            Rectangle(SKETCH12_W, SKETCH12_H)
    boss_extrude9 = extrude(amount=BOSS_EXTRUDE9_DEPTH)

    # CirPattern1: Boss-Extrude9 ×2 about axis
    cirpattern1_axis = Axis((0, 0, 0), (0, 1, 0))
    for i in range(1, CIRPATTERN1_COUNT):
        add(boss_extrude9.rotate(cirpattern1_axis, i * 360 / CIRPATTERN1_COUNT))


solid = part.part
